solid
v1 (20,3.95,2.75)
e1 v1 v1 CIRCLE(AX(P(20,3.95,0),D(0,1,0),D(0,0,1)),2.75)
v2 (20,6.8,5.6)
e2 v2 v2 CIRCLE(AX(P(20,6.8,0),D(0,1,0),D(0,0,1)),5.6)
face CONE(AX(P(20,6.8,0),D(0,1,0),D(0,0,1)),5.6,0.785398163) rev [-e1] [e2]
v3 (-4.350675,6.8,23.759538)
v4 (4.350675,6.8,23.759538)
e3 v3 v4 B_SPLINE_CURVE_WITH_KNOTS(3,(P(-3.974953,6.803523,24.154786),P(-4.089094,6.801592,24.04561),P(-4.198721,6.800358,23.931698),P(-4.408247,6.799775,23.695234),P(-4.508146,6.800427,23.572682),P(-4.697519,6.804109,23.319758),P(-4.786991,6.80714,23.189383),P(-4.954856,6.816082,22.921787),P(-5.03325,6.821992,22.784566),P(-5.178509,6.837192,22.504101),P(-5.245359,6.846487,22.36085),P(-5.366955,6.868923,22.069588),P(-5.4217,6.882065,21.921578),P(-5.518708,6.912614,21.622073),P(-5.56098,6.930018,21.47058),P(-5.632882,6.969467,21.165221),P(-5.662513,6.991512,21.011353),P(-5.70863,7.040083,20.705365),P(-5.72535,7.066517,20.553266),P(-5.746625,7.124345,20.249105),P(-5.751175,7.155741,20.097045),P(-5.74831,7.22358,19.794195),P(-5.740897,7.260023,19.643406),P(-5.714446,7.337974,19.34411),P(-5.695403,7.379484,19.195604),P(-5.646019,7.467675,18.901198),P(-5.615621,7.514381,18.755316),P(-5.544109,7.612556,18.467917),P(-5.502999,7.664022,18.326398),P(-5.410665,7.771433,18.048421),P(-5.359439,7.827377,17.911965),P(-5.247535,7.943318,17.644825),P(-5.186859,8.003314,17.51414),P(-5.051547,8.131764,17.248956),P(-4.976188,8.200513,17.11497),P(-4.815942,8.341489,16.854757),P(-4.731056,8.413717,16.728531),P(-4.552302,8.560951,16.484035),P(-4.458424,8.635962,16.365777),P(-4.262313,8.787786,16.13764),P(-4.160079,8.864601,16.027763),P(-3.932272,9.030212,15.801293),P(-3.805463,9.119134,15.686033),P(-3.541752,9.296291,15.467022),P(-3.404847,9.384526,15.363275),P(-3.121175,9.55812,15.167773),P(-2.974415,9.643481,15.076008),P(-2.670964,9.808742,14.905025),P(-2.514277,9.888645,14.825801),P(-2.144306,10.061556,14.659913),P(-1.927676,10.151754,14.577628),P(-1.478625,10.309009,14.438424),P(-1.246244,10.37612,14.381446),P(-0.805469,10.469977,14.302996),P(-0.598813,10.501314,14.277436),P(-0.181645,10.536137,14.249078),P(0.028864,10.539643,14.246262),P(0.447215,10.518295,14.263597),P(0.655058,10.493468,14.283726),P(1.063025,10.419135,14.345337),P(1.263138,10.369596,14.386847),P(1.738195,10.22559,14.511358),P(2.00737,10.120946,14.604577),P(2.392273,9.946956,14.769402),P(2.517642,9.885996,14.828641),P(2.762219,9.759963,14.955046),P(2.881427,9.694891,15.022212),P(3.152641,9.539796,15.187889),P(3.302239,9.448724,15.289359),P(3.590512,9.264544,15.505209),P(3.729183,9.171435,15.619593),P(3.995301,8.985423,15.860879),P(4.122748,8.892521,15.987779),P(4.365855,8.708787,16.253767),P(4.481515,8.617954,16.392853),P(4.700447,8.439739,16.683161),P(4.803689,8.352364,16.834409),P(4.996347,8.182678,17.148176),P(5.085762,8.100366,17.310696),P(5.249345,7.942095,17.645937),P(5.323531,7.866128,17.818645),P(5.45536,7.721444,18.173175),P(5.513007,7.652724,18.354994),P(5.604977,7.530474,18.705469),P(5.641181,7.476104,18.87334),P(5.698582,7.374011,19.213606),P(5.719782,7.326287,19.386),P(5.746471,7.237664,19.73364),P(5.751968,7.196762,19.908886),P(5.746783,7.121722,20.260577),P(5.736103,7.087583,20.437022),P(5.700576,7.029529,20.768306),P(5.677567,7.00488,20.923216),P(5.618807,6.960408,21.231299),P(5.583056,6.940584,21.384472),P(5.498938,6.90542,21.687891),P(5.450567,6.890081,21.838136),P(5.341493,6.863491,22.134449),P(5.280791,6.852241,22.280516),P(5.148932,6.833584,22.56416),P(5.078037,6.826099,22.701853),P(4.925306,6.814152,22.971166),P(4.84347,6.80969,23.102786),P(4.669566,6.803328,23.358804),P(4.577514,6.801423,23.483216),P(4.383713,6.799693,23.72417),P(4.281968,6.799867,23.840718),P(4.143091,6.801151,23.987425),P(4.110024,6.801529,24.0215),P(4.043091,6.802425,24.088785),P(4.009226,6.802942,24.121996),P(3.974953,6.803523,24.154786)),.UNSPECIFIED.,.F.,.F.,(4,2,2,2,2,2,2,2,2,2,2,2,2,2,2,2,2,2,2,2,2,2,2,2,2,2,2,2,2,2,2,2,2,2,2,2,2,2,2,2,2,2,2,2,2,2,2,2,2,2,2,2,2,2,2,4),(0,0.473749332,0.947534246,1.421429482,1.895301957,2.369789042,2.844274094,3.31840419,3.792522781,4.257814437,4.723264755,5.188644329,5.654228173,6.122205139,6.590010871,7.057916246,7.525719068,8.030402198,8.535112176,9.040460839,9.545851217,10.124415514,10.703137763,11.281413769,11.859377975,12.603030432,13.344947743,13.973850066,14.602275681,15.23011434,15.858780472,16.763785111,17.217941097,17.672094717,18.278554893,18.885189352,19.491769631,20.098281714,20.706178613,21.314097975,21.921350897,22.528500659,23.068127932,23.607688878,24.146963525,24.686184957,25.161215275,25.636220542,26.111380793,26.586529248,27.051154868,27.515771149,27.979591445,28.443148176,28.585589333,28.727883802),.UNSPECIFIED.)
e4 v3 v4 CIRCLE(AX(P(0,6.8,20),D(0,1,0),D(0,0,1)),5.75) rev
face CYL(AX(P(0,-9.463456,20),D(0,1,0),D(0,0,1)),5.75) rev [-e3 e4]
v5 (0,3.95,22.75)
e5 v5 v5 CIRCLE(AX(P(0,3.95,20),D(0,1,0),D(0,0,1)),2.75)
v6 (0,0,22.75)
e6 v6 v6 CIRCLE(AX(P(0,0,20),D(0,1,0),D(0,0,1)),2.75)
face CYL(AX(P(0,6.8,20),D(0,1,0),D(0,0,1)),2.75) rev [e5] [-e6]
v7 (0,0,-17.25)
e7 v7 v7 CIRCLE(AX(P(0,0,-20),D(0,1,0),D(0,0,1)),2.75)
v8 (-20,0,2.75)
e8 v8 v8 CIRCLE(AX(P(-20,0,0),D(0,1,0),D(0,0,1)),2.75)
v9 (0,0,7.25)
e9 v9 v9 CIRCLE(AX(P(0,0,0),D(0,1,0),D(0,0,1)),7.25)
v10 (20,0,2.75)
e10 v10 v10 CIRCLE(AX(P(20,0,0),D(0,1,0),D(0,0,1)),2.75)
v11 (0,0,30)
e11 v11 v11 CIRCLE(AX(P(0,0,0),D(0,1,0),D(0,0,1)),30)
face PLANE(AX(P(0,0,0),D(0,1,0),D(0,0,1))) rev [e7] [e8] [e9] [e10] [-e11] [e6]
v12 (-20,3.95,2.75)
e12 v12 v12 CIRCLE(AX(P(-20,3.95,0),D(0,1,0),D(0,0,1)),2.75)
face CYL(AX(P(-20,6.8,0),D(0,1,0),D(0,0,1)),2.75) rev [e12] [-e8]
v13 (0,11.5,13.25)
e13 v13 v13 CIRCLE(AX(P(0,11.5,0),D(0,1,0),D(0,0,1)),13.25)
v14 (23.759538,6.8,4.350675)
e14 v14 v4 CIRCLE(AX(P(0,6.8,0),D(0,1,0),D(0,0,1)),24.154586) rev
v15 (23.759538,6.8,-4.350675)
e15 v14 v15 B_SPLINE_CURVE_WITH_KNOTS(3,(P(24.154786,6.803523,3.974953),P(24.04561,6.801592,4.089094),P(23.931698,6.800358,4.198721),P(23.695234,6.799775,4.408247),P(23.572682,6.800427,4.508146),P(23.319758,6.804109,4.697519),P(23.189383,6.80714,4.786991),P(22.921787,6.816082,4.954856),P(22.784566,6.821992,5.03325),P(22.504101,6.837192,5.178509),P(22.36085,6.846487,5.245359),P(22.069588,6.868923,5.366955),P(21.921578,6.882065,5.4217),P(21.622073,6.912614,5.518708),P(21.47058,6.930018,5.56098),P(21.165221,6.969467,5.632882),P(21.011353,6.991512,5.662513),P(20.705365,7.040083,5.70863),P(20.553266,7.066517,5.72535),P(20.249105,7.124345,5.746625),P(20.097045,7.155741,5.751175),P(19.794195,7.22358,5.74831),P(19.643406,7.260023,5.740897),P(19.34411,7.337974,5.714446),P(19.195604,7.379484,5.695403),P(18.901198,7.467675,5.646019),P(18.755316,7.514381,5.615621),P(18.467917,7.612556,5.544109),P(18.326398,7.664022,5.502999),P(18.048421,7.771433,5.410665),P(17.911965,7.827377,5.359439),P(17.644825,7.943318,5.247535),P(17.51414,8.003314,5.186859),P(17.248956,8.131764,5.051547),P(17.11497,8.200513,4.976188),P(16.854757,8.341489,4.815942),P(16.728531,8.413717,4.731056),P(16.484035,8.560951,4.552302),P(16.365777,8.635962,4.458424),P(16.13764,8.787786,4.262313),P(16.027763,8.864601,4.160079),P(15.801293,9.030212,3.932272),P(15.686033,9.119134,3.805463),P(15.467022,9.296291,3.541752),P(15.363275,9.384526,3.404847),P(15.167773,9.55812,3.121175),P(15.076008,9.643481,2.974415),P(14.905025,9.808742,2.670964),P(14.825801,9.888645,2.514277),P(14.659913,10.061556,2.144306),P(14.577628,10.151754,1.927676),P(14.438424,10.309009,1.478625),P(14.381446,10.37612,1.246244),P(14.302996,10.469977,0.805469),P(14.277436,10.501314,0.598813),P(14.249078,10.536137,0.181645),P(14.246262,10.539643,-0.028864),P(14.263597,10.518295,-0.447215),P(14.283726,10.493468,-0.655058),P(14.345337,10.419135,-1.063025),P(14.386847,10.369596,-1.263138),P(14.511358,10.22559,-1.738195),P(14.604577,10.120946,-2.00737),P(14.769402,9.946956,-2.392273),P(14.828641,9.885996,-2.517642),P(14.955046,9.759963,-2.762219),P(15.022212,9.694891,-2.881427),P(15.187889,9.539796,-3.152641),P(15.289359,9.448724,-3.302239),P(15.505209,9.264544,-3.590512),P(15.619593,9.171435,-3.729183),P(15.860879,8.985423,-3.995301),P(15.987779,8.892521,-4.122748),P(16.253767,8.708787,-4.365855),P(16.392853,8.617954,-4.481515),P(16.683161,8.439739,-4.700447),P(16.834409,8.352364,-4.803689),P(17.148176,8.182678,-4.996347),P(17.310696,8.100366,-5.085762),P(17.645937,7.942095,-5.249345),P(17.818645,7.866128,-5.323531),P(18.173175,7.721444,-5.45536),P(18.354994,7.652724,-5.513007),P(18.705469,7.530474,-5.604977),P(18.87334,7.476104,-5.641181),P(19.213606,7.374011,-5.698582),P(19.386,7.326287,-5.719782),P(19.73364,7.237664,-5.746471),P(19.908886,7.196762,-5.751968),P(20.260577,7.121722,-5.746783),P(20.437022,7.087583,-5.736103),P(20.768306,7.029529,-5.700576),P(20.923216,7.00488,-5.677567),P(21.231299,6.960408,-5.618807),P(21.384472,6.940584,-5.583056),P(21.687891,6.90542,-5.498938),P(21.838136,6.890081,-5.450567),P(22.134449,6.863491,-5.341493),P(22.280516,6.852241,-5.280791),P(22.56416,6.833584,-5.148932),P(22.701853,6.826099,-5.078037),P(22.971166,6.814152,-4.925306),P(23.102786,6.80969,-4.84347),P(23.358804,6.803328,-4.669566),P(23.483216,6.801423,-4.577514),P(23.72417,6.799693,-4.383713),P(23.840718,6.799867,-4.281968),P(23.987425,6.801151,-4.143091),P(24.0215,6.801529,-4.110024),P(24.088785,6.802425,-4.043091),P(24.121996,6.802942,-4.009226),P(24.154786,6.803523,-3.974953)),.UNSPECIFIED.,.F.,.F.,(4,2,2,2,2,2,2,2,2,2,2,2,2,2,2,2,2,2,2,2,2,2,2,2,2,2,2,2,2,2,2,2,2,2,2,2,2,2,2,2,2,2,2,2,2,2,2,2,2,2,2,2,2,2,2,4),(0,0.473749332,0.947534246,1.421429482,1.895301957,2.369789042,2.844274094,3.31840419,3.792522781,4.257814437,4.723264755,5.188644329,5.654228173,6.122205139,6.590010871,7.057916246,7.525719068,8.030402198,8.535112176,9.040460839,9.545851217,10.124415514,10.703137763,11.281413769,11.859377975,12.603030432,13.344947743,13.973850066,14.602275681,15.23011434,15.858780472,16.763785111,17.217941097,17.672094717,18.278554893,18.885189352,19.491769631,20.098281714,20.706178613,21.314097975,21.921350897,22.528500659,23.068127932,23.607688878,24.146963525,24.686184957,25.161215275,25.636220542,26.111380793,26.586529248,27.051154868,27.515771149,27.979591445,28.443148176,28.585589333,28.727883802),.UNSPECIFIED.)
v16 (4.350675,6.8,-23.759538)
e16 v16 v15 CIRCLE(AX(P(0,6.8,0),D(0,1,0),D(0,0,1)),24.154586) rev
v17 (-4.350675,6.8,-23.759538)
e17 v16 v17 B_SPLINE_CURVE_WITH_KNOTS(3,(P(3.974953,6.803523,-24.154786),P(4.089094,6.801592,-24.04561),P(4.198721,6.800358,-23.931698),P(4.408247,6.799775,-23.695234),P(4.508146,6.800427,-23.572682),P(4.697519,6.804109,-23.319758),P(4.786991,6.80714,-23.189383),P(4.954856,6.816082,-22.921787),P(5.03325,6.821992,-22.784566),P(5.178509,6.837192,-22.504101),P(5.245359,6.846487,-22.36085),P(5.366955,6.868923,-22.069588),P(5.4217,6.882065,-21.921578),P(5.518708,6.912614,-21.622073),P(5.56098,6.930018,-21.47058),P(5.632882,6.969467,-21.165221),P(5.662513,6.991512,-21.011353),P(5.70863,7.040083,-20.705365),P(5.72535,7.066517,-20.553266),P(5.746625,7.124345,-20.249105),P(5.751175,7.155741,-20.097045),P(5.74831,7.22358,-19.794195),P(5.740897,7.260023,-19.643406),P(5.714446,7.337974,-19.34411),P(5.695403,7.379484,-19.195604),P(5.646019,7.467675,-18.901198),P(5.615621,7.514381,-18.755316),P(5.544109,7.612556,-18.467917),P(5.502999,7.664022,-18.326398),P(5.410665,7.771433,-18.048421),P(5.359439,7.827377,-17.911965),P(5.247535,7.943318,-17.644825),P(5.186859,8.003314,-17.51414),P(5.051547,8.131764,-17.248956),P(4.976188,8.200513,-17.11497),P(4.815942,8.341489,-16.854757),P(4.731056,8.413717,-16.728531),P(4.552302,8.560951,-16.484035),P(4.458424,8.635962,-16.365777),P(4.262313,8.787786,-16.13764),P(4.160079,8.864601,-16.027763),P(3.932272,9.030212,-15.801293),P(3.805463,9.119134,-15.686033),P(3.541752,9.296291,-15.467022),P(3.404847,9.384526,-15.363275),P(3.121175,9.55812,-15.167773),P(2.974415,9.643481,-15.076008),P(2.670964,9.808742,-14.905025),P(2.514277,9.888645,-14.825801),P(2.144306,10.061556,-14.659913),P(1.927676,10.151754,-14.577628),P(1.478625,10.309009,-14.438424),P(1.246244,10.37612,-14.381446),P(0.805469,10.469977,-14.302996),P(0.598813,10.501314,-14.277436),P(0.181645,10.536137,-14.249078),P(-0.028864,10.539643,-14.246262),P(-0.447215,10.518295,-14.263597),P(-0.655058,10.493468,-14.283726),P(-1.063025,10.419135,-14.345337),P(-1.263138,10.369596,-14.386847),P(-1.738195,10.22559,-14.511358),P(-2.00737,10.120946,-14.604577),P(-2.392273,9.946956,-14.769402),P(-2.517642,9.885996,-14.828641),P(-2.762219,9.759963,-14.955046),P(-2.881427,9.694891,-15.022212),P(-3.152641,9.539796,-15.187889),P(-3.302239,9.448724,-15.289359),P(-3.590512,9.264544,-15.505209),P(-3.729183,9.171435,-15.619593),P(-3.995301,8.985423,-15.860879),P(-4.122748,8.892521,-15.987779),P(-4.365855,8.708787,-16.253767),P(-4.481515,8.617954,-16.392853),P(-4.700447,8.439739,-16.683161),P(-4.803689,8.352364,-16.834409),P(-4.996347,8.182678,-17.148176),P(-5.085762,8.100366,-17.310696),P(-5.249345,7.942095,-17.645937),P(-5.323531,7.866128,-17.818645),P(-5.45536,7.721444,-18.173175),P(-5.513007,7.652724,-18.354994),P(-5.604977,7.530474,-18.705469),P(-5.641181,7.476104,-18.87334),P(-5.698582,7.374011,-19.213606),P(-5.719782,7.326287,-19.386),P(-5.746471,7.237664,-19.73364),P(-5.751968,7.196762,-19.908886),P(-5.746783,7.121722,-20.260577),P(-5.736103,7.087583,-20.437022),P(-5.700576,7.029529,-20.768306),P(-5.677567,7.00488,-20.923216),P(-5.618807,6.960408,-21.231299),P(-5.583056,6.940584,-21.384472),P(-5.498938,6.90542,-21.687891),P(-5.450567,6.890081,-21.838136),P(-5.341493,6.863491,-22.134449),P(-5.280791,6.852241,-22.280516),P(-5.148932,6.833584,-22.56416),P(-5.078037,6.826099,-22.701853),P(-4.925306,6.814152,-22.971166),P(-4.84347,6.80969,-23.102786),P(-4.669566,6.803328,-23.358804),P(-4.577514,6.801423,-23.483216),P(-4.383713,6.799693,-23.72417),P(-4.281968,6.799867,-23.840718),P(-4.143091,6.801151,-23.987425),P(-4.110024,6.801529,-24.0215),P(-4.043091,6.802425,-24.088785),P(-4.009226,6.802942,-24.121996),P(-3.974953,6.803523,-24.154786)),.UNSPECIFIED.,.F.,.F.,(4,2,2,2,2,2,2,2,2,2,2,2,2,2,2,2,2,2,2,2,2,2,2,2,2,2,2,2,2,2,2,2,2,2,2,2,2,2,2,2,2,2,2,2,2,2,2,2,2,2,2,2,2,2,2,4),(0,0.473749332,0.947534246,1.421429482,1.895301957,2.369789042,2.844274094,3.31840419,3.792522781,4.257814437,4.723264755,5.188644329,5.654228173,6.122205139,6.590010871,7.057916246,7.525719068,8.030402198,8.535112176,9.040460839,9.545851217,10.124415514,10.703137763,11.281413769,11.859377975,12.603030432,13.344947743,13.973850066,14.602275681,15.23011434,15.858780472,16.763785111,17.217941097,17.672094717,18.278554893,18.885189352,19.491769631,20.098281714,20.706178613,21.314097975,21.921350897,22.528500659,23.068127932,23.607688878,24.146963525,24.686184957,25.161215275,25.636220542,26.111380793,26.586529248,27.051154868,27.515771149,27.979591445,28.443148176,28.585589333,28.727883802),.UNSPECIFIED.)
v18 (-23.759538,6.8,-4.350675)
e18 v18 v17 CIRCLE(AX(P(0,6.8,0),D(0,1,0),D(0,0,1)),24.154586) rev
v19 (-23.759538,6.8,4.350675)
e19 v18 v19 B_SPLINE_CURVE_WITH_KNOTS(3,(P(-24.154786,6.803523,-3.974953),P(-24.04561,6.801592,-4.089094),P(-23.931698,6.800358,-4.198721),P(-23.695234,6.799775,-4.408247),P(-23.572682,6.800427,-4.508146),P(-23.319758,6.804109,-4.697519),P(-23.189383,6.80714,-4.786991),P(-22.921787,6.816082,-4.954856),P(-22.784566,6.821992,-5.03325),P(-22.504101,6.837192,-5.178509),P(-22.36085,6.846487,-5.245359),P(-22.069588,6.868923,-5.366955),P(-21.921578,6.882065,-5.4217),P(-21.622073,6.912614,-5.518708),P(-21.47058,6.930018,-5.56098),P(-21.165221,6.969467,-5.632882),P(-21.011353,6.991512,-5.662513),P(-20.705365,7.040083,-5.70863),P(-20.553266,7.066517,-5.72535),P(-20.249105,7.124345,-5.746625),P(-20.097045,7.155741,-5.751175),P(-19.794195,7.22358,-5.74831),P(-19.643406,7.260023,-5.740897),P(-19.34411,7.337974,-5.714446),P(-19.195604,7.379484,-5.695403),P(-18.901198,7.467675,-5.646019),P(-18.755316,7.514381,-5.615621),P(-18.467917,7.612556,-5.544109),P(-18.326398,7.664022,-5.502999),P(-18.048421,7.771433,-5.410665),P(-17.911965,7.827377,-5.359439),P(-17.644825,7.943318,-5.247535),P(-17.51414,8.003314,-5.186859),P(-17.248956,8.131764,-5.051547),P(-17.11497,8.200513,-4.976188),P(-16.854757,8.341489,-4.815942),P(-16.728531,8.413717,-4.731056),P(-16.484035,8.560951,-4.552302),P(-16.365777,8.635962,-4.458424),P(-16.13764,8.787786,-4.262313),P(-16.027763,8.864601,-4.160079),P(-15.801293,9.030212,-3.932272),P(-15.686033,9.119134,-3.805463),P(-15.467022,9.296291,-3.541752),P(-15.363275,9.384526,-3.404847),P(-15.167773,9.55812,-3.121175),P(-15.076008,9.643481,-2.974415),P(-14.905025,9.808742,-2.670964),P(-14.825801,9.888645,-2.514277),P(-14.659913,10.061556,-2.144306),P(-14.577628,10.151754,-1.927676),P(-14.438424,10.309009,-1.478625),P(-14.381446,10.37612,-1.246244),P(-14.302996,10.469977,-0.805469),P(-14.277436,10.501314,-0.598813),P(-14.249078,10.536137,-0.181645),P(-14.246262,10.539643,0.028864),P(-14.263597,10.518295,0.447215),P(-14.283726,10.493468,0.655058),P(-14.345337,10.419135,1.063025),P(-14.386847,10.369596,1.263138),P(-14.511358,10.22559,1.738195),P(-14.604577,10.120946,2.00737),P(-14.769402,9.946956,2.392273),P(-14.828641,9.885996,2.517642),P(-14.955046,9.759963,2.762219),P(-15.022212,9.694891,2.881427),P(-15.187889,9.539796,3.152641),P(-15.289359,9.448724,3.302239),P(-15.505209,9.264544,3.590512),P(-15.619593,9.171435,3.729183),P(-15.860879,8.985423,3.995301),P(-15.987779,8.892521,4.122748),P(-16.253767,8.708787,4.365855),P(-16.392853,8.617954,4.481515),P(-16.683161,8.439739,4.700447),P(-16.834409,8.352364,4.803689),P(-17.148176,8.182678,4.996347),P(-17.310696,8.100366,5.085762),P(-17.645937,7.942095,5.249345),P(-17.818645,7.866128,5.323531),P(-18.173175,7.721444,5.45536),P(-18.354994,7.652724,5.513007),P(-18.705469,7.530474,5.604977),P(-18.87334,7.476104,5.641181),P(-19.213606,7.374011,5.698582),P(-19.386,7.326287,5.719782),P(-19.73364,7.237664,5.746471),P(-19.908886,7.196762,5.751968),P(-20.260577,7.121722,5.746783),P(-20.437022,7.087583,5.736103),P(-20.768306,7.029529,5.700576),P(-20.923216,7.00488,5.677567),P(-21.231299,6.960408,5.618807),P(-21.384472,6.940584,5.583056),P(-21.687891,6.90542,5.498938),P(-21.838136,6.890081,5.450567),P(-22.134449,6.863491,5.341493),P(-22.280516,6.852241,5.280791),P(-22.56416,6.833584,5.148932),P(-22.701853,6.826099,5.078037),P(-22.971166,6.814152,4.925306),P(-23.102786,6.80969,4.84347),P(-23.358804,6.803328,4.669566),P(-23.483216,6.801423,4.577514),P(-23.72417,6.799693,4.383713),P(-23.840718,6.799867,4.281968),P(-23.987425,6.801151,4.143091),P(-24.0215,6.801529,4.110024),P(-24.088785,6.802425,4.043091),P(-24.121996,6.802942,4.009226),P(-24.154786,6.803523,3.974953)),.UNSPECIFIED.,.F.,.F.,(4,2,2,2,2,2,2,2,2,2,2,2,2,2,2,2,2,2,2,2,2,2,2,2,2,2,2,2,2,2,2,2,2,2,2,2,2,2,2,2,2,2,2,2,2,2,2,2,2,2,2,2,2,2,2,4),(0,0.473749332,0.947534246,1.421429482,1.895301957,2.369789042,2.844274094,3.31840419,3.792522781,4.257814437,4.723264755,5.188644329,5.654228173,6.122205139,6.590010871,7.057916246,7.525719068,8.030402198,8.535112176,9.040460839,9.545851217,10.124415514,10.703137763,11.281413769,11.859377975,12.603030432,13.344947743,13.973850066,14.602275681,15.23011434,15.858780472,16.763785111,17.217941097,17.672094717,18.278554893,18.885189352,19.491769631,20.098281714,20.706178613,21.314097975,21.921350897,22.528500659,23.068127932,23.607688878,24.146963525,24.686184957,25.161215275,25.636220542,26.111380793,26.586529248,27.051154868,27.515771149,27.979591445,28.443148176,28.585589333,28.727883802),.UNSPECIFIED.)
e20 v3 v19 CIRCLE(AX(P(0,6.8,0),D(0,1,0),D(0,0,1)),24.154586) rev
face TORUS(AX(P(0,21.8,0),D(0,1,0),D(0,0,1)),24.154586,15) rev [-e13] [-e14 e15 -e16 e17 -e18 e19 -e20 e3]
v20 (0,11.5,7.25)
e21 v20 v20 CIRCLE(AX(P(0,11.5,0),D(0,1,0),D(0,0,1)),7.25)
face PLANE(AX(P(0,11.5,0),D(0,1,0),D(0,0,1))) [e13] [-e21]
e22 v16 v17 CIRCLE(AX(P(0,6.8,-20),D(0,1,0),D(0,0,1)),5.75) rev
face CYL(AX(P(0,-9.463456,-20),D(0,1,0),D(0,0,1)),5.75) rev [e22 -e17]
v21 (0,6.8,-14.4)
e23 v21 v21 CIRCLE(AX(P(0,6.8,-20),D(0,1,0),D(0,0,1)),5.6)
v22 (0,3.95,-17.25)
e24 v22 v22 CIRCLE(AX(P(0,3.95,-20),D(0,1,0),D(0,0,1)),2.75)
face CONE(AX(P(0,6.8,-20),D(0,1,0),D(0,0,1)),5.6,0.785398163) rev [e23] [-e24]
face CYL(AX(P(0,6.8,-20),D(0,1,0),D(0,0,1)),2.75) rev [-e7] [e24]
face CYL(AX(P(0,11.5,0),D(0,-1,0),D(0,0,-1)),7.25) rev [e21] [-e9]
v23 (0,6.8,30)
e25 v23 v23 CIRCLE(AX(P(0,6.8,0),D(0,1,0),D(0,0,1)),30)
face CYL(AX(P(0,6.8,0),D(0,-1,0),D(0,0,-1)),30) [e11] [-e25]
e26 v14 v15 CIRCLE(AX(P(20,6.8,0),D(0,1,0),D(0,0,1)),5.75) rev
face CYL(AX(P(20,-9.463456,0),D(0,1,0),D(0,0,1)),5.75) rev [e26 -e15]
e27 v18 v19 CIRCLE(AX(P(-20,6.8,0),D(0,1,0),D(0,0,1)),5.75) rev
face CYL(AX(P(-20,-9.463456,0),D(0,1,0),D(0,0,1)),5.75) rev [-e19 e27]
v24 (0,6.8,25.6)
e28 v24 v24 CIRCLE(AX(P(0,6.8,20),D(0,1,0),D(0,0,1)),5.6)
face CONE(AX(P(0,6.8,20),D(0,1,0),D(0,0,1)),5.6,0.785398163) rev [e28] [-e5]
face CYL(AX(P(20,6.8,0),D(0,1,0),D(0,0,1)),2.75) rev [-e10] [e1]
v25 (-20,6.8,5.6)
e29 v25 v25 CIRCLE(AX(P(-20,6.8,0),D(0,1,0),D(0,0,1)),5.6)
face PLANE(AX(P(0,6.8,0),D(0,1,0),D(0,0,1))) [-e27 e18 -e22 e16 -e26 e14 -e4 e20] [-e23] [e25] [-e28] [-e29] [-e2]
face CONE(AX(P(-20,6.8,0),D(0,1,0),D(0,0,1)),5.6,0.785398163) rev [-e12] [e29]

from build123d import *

# Parameters (mm, degrees)
SKETCH2_R           = 30
BOSS_EXTRUDE1_DEPTH = 6.8
SKETCH3_R           = 13.25
SKETCH3_R_2         = 7.25
BOSS_EXTRUDE2_DEPTH = 4.7
FILLET1_R           = 15
SKETCH6_R           = 5.75
CUT_EXTRUDE3_DEPTH  = 4.7
CIRPATTERN1_COUNT   = 4
SKETCH7_R           = 7.25
CUT_EXTRUDE4_DEPTH  = 44.957365708


with BuildPart() as part:
    # Sketch2 → Boss-Extrude1 (new body)
    with BuildSketch(Plane(origin=(0, 0, 0), x_dir=(1, 0, 0), z_dir=(0, 1, 0))):
        with Locations(Location((0, 0, 0), (0, 0, 270))):
            Circle(SKETCH2_R)
    extrude(amount=BOSS_EXTRUDE1_DEPTH)

    # Sketch3 → Boss-Extrude2 (add)
    with BuildSketch(Plane(origin=(0, 6.8, 0), x_dir=(1, 0, 0), z_dir=(0, 1, 0))):
        with Locations(Location((0, 0, 0), (0, 0, 270))):
            Circle(SKETCH3_R)
        with Locations(Location((0, 0, 0), (0, 0, 270))):
            Circle(SKETCH3_R_2, mode=Mode.SUBTRACT)
    extrude(amount=BOSS_EXTRUDE2_DEPTH)

    # Fillet1
    # the kernel refuses this fillet: 15 mm, written as the material it adds along each edge
    with BuildSketch(Plane(origin=(0, 6.8, 0), x_dir=(0, 0, 1), z_dir=(-1, 0, 0))) as fillet1_piece_1:
        with BuildLine():
            CenterArc((24.154586191, 15), FILLET1_R, 223.366822413, 46.633177587)
            Line((13.25, 4.7), (13.031908276, 4.494))
            ThreePointArc((13.031908276, 4.494), (12.95, 2.35), (12.95, 0))
            Line((12.95, 0), (13.25, -0.3))
            Line((13.25, -0.3), (24.154586191, -0.3))
            Line((24.154586191, -0.3), (24.154586191, 0))
        make_face()
    revolve(axis=Axis((0, 6.8, 0), (0, 1, 0)))

    # Sketch9 → CSK for M5 Hex Socket Countersunk Cap Screw1 (revolve, cut)
    with BuildSketch(Plane(origin=(0, 6.8, -20), x_dir=(0, 0, 1), z_dir=(1, 0, 0))):
        Polygon((0, 0), (0, 6.8), (2.75, 6.8), (2.75, 2.85), (5.6, 0), align=None)
    csk_for_m5_hex_socket_countersunk_cap_sc = revolve(axis=Axis((0, 13.15, -20), (0, -1, 0)), mode=Mode.SUBTRACT)

    # Sketch6 → Cut-Extrude3 (cut)
    with BuildSketch(Plane(origin=(0, 11.5, 0), x_dir=(1, 0, 0), z_dir=(0, 1, 0))):
        with Locations((0, 20)):
            Circle(SKETCH6_R)
    cut_extrude3 = extrude(amount=-CUT_EXTRUDE3_DEPTH, mode=Mode.SUBTRACT)

    # CirPattern1: CSK for M5 Hex Socket Countersunk Cap Screw1, Cut-Extrude3 ×4 about axis
    cirpattern1_axis = Axis((0, 0, 0), (0, 1, 0))
    add([csk_for_m5_hex_socket_countersunk_cap_sc.rotate(cirpattern1_axis, i * 360 / CIRPATTERN1_COUNT) for i in range(1, CIRPATTERN1_COUNT)], mode=Mode.SUBTRACT)
    add([cut_extrude3.rotate(cirpattern1_axis, i * 360 / CIRPATTERN1_COUNT) for i in range(1, CIRPATTERN1_COUNT)], mode=Mode.SUBTRACT)

    # Sketch7 → Cut-Extrude4 (cut, through all)
    with BuildSketch(Plane(origin=(0, 11.5, 0), x_dir=(1, 0, 0), z_dir=(0, 1, 0))):
        with Locations(Location((0, 0, 0), (0, 0, 270))):
            Circle(SKETCH7_R)
    extrude(amount=-CUT_EXTRUDE4_DEPTH, mode=Mode.SUBTRACT)


solid = part.part
